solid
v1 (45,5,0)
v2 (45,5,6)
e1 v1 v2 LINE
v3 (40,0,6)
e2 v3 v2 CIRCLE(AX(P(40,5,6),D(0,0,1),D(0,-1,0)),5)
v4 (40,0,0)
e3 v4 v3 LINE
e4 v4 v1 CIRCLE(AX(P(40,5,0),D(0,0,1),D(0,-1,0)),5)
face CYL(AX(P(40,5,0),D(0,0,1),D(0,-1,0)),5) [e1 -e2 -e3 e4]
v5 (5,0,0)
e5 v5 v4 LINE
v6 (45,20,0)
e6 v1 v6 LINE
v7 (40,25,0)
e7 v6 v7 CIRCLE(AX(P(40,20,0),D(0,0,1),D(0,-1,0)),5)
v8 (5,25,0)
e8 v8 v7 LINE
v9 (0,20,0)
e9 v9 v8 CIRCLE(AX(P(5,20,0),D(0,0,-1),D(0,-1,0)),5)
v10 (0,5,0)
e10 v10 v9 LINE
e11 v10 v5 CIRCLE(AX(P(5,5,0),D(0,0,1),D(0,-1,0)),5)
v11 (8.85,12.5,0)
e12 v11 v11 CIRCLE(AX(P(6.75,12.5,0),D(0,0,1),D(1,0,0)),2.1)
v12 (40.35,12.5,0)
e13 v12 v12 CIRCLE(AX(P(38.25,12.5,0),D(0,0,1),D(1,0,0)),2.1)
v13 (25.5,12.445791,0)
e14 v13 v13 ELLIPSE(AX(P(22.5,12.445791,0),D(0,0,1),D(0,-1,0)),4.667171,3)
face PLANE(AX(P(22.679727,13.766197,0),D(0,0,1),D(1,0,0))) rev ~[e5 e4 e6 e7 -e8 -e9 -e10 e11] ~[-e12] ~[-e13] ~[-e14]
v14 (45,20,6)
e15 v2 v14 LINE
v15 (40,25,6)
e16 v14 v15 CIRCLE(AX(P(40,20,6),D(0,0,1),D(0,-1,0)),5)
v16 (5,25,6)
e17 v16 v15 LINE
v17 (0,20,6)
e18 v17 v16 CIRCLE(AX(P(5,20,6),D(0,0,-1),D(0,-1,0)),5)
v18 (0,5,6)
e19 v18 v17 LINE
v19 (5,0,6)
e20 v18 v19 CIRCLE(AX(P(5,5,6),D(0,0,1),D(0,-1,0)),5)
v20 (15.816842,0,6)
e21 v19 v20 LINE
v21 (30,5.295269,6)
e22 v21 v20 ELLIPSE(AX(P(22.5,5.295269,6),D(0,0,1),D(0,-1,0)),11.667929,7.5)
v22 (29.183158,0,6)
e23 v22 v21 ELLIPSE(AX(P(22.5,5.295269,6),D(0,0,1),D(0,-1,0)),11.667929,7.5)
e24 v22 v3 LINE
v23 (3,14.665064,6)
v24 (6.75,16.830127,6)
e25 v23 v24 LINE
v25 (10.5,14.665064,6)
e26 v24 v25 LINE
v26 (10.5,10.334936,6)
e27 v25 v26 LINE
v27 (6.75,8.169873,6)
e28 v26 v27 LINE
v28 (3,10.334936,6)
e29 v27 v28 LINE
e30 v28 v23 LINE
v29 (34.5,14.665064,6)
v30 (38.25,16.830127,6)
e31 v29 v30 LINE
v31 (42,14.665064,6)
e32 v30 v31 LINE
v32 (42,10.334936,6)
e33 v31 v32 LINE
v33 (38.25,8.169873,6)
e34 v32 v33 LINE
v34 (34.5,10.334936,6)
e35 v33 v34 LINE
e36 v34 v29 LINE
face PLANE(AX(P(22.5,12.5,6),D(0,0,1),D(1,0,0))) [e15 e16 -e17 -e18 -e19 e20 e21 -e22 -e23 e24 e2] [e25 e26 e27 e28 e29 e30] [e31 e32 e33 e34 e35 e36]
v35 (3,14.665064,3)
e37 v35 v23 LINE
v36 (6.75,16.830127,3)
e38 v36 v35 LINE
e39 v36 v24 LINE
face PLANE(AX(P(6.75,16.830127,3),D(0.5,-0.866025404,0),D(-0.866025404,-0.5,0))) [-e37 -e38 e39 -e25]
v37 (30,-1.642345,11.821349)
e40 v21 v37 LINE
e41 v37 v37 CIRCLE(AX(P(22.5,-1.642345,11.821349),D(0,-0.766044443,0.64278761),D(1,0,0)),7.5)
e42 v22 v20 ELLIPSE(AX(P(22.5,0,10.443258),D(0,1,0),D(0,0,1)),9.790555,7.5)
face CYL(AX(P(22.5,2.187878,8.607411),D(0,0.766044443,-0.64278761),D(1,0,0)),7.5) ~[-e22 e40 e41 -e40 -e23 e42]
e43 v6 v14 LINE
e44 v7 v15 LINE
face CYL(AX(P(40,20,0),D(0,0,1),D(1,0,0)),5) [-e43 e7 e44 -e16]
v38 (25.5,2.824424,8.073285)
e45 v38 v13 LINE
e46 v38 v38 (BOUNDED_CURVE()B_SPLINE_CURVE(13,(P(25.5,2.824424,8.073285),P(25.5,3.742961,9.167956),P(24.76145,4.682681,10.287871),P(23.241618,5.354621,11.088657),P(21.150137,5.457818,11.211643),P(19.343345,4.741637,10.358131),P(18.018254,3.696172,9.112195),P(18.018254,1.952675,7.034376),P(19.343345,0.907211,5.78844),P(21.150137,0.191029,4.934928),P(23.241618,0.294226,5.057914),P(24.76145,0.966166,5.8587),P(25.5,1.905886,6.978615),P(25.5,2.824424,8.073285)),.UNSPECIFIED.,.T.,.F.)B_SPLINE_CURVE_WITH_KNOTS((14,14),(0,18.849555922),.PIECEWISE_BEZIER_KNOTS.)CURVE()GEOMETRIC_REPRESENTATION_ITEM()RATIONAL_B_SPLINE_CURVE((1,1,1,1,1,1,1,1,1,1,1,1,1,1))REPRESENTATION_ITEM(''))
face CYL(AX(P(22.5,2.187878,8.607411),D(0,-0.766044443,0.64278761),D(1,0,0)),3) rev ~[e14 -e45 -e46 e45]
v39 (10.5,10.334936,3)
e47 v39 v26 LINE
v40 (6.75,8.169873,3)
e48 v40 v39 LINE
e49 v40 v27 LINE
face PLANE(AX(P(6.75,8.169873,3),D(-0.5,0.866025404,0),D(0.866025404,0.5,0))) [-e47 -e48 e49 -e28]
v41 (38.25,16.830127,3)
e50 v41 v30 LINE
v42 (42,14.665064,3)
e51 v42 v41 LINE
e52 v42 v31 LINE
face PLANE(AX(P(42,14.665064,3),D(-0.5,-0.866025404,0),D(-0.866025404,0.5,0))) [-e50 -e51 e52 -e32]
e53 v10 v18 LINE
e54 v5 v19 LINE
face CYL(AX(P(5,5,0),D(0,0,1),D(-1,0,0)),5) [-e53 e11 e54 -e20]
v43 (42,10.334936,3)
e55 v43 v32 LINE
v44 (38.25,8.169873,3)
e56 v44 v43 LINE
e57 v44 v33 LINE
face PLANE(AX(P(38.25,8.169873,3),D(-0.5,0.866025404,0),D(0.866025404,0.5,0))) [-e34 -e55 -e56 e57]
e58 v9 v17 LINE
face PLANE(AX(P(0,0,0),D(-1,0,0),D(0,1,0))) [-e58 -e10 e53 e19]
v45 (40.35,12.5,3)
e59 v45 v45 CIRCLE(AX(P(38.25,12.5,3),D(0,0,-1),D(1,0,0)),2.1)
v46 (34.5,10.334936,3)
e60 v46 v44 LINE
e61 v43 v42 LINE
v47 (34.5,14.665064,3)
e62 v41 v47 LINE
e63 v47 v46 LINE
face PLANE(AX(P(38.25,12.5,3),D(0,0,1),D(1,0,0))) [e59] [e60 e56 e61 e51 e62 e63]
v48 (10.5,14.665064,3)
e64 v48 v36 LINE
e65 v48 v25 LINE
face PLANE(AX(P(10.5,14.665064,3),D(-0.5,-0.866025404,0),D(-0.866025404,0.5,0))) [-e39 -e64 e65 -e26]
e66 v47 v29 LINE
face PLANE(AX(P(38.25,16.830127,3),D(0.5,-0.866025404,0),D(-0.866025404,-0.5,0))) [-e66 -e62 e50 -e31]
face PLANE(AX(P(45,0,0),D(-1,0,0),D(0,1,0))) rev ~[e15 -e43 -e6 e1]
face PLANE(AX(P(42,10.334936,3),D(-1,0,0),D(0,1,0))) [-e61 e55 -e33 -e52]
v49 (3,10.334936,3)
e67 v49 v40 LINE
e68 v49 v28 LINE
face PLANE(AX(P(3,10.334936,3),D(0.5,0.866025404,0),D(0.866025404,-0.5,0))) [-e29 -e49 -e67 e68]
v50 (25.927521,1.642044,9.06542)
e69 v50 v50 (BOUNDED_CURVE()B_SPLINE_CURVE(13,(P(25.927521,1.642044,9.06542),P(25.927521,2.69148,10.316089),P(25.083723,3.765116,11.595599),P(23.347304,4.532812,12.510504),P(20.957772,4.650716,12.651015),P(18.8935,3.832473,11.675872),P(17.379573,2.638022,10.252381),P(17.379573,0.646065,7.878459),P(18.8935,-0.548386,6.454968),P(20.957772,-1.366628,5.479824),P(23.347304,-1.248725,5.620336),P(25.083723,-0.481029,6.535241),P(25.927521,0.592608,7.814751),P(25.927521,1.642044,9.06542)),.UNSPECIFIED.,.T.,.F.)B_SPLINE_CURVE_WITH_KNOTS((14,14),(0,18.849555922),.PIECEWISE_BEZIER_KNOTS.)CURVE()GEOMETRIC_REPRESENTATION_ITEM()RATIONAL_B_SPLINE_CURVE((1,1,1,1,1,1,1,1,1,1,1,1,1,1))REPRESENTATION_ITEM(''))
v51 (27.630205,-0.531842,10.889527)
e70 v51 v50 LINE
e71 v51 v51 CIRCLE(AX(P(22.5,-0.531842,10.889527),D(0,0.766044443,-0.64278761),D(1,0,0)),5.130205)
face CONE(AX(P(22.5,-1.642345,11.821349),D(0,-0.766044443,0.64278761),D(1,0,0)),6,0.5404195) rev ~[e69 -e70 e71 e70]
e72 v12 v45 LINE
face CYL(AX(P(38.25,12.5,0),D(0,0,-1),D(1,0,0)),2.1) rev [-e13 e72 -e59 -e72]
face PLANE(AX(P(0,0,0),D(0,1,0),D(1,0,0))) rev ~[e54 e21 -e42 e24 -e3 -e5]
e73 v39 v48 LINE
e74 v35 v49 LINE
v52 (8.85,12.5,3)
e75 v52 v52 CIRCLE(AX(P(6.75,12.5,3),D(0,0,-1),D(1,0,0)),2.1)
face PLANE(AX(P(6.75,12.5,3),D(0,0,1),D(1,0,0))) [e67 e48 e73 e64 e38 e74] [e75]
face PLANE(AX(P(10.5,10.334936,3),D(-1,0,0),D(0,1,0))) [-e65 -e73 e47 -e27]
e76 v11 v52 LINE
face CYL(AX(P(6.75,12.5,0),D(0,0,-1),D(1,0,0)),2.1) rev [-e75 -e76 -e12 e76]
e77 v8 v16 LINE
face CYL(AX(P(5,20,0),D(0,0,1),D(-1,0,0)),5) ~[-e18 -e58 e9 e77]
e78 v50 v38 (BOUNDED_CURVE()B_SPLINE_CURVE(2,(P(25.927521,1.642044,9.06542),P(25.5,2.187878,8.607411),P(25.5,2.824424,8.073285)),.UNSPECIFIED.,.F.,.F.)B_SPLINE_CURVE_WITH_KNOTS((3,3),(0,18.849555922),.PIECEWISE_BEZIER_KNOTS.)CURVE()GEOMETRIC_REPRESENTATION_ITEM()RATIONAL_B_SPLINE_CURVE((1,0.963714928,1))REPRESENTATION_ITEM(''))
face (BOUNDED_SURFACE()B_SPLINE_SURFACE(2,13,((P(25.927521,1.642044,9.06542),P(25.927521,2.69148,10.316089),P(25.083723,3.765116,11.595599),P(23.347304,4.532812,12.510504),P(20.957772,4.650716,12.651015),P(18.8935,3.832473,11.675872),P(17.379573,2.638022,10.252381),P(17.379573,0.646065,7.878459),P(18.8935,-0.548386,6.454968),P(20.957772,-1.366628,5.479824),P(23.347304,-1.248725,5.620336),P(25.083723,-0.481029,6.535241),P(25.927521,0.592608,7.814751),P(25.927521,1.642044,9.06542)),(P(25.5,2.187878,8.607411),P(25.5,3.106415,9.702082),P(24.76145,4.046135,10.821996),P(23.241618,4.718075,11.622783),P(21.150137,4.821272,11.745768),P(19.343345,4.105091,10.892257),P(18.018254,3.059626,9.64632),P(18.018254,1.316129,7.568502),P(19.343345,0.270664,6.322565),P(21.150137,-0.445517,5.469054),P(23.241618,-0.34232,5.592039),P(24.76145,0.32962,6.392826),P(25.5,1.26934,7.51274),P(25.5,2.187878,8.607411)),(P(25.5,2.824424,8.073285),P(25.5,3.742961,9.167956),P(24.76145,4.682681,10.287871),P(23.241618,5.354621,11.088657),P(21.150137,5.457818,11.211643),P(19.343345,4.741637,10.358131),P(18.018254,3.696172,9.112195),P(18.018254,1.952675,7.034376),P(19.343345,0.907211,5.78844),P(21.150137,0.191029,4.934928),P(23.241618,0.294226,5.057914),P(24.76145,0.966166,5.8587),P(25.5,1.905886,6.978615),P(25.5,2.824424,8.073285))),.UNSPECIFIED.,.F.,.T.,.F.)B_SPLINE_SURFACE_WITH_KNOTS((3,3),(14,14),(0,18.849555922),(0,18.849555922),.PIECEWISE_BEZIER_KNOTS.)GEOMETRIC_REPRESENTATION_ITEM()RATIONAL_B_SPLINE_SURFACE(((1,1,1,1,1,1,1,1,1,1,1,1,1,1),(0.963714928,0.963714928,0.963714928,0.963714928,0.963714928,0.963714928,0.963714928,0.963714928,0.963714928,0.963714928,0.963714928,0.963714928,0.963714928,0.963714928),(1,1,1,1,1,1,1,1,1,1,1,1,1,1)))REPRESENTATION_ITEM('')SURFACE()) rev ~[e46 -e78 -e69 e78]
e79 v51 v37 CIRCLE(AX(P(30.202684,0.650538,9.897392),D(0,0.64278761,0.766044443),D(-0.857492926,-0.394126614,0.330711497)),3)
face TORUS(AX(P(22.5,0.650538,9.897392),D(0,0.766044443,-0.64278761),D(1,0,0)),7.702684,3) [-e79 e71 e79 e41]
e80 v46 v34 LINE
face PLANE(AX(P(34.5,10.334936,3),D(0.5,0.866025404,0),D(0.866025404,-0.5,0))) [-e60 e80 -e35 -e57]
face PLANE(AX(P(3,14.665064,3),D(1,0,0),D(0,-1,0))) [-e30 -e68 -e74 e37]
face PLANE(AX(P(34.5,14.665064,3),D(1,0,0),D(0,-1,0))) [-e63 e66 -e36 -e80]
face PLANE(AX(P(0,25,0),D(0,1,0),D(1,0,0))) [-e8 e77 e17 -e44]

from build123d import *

# Parameters (mm, degrees)
F0_W           = 45
F0_H           = 25
F1_DEPTH       = 6
F2_R           = 5
F5_DEPTH       = 25
F6_R           = 2.1
F7_DEPTH       = 25
F9_R           = 7.5
F10_DEPTH      = 5
F10_DEPTH_BACK = 25
F11_W          = 49.2877000943
F11_H          = 30.2235903218
F12_DEPTH      = 25
F13_W          = 37.6632460393
F13_H          = 10.6945014559
F14_DEPTH      = 25
F15_R          = 3
F16_DEPTH      = 25
F16_DEPTH_BACK = 25
F18_R          = 3


# Not quite as in the source:
# - a fillet or chamfer that OpenCascade refuses, or shapes differently, is made with other operations: its cross-section is extruded or revolved along the edge and cut away or added


with BuildPart() as f1:
    # F0 (on Top) → F1 (new body)
    with BuildSketch(Plane.XY):
        with Locations((22.5, 12.5)):
            Rectangle(F0_W, F0_H)
    extrude(amount=F1_DEPTH)

    # F2
    f2_edges = [f1.edges().sort_by_distance(p)[0] for p in [
        (45, 25, 3),
        (45, 0, 3),
        (0, 25, 3),
        (0, 0, 3),
    ]]
    fillet(f2_edges, radius=F2_R)

    # F4 (on offset) → F5 (cut)
    with BuildSketch(Plane.XY.offset(3)):
        Polygon((3, 14.6650635095), (3, 10.3349364905), (6.75, 8.1698729811), (10.5, 10.3349364905), (10.5, 14.6650635095), (6.75, 16.8301270189), align=None)
        Polygon((42, 10.3349364905), (42, 14.6650635095), (38.25, 16.8301270189), (34.5, 14.6650635095), (34.5, 10.3349364905), (38.25, 8.1698729811), align=None)
    extrude(amount=F5_DEPTH, mode=Mode.SUBTRACT)

    # F6 (on Top) → F7 (cut)
    with BuildSketch(Plane.XY):
        with Locations((6.75, 12.5)):
            Circle(F6_R)
        with Locations((38.25, 12.5)):
            Circle(F6_R)
    extrude(amount=F7_DEPTH, mode=Mode.SUBTRACT)

    # F9 (on face) → F10 (join, two sides)
    with BuildSketch(Plane(origin=(0, -2.954423259, 2.479055467), x_dir=(1, 0, 0), z_dir=(0, -0.7660444431, 0.6427876097))) as f10_sk:
        with Locations((22.5, 8)):
            Circle(F9_R)
    extrude(amount=F10_DEPTH)
    extrude(f10_sk.sketch, amount=-F10_DEPTH_BACK)

    # F11 (on Top) → F12 (cut)
    with BuildSketch(Plane.XY):
        with Locations((22.6797270589, 13.7661970221)):
            Rectangle(F11_W, F11_H)
    extrude(amount=-F12_DEPTH, mode=Mode.SUBTRACT)

    # F13 (on face) → F14 (cut)
    with BuildSketch(Plane(origin=(0, 25, 0), x_dir=(-1, 0, 0), z_dir=(0, 1, 0))):
        with Locations((-22.6992729586, 2.3689556401)):
            Rectangle(F13_W, F13_H)
    extrude(amount=F14_DEPTH, mode=Mode.SUBTRACT)

    # F15 (on face) → F16 (cut, two sides)
    with BuildSketch(Plane(origin=(0, -2.954423259, 2.479055467), x_dir=(1, 0, 0), z_dir=(0, -0.7660444431, 0.6427876097))) as f16_sk:
        with Locations((22.5, 8)):
            Circle(F15_R)
    extrude(amount=F16_DEPTH, mode=Mode.SUBTRACT)
    extrude(f16_sk.sketch, amount=-F16_DEPTH_BACK, mode=Mode.SUBTRACT)

    # F17: chamfer of 3 x 5 on 1 edges, made by hand

    # F17_s1 → F17_t2 (revolve, cut)
    with BuildSketch(Plane(origin=(0, 5.1423008775, 6.128355545), x_dir=(1, 0, 0), z_dir=(0, 0.6427876097, 0.7660444431))):
        Polygon((28.5, -8.8567256581), (25.5, -3.8567256581), (25.5, -8.8567256581), align=None)
    revolve(axis=Axis((22.5, -1.6423445971, 11.8213490604), (0, 0.7660444431, -0.6427876097)), mode=Mode.SUBTRACT)

    # F18
    f18_edges = [f1.edges().sort_by_distance(p)[0] for p in [
        (19.5, 2.187878, 8.607411),
    ]]
    fillet(f18_edges, radius=F18_R)

    # F19: fillet of radius 3 on 1 edges, made by hand

    # F19_s1 → F19_t2 (revolve, cut)
    with BuildSketch(Plane(origin=(0, 5.1423008775, 6.128355545), x_dir=(1, 0, 0), z_dir=(0, 0.6427876097, 0.7660444431))):
        with BuildLine():
            ThreePointArc((27.6302051352, -7.4070675501), (28.6371938466, -8.4227287465), (30, -8.8567256581))
            Line((30, -8.8567256581), (28.5, -8.8567256581))
            Line((28.5, -8.8567256581), (27.6302051352, -7.4070675501))
        make_face()
    revolve(axis=Axis((22.5, -1.6423445971, 11.8213490604), (0, 0.7660444431, -0.6427876097)), mode=Mode.SUBTRACT)


solid = f1.part
